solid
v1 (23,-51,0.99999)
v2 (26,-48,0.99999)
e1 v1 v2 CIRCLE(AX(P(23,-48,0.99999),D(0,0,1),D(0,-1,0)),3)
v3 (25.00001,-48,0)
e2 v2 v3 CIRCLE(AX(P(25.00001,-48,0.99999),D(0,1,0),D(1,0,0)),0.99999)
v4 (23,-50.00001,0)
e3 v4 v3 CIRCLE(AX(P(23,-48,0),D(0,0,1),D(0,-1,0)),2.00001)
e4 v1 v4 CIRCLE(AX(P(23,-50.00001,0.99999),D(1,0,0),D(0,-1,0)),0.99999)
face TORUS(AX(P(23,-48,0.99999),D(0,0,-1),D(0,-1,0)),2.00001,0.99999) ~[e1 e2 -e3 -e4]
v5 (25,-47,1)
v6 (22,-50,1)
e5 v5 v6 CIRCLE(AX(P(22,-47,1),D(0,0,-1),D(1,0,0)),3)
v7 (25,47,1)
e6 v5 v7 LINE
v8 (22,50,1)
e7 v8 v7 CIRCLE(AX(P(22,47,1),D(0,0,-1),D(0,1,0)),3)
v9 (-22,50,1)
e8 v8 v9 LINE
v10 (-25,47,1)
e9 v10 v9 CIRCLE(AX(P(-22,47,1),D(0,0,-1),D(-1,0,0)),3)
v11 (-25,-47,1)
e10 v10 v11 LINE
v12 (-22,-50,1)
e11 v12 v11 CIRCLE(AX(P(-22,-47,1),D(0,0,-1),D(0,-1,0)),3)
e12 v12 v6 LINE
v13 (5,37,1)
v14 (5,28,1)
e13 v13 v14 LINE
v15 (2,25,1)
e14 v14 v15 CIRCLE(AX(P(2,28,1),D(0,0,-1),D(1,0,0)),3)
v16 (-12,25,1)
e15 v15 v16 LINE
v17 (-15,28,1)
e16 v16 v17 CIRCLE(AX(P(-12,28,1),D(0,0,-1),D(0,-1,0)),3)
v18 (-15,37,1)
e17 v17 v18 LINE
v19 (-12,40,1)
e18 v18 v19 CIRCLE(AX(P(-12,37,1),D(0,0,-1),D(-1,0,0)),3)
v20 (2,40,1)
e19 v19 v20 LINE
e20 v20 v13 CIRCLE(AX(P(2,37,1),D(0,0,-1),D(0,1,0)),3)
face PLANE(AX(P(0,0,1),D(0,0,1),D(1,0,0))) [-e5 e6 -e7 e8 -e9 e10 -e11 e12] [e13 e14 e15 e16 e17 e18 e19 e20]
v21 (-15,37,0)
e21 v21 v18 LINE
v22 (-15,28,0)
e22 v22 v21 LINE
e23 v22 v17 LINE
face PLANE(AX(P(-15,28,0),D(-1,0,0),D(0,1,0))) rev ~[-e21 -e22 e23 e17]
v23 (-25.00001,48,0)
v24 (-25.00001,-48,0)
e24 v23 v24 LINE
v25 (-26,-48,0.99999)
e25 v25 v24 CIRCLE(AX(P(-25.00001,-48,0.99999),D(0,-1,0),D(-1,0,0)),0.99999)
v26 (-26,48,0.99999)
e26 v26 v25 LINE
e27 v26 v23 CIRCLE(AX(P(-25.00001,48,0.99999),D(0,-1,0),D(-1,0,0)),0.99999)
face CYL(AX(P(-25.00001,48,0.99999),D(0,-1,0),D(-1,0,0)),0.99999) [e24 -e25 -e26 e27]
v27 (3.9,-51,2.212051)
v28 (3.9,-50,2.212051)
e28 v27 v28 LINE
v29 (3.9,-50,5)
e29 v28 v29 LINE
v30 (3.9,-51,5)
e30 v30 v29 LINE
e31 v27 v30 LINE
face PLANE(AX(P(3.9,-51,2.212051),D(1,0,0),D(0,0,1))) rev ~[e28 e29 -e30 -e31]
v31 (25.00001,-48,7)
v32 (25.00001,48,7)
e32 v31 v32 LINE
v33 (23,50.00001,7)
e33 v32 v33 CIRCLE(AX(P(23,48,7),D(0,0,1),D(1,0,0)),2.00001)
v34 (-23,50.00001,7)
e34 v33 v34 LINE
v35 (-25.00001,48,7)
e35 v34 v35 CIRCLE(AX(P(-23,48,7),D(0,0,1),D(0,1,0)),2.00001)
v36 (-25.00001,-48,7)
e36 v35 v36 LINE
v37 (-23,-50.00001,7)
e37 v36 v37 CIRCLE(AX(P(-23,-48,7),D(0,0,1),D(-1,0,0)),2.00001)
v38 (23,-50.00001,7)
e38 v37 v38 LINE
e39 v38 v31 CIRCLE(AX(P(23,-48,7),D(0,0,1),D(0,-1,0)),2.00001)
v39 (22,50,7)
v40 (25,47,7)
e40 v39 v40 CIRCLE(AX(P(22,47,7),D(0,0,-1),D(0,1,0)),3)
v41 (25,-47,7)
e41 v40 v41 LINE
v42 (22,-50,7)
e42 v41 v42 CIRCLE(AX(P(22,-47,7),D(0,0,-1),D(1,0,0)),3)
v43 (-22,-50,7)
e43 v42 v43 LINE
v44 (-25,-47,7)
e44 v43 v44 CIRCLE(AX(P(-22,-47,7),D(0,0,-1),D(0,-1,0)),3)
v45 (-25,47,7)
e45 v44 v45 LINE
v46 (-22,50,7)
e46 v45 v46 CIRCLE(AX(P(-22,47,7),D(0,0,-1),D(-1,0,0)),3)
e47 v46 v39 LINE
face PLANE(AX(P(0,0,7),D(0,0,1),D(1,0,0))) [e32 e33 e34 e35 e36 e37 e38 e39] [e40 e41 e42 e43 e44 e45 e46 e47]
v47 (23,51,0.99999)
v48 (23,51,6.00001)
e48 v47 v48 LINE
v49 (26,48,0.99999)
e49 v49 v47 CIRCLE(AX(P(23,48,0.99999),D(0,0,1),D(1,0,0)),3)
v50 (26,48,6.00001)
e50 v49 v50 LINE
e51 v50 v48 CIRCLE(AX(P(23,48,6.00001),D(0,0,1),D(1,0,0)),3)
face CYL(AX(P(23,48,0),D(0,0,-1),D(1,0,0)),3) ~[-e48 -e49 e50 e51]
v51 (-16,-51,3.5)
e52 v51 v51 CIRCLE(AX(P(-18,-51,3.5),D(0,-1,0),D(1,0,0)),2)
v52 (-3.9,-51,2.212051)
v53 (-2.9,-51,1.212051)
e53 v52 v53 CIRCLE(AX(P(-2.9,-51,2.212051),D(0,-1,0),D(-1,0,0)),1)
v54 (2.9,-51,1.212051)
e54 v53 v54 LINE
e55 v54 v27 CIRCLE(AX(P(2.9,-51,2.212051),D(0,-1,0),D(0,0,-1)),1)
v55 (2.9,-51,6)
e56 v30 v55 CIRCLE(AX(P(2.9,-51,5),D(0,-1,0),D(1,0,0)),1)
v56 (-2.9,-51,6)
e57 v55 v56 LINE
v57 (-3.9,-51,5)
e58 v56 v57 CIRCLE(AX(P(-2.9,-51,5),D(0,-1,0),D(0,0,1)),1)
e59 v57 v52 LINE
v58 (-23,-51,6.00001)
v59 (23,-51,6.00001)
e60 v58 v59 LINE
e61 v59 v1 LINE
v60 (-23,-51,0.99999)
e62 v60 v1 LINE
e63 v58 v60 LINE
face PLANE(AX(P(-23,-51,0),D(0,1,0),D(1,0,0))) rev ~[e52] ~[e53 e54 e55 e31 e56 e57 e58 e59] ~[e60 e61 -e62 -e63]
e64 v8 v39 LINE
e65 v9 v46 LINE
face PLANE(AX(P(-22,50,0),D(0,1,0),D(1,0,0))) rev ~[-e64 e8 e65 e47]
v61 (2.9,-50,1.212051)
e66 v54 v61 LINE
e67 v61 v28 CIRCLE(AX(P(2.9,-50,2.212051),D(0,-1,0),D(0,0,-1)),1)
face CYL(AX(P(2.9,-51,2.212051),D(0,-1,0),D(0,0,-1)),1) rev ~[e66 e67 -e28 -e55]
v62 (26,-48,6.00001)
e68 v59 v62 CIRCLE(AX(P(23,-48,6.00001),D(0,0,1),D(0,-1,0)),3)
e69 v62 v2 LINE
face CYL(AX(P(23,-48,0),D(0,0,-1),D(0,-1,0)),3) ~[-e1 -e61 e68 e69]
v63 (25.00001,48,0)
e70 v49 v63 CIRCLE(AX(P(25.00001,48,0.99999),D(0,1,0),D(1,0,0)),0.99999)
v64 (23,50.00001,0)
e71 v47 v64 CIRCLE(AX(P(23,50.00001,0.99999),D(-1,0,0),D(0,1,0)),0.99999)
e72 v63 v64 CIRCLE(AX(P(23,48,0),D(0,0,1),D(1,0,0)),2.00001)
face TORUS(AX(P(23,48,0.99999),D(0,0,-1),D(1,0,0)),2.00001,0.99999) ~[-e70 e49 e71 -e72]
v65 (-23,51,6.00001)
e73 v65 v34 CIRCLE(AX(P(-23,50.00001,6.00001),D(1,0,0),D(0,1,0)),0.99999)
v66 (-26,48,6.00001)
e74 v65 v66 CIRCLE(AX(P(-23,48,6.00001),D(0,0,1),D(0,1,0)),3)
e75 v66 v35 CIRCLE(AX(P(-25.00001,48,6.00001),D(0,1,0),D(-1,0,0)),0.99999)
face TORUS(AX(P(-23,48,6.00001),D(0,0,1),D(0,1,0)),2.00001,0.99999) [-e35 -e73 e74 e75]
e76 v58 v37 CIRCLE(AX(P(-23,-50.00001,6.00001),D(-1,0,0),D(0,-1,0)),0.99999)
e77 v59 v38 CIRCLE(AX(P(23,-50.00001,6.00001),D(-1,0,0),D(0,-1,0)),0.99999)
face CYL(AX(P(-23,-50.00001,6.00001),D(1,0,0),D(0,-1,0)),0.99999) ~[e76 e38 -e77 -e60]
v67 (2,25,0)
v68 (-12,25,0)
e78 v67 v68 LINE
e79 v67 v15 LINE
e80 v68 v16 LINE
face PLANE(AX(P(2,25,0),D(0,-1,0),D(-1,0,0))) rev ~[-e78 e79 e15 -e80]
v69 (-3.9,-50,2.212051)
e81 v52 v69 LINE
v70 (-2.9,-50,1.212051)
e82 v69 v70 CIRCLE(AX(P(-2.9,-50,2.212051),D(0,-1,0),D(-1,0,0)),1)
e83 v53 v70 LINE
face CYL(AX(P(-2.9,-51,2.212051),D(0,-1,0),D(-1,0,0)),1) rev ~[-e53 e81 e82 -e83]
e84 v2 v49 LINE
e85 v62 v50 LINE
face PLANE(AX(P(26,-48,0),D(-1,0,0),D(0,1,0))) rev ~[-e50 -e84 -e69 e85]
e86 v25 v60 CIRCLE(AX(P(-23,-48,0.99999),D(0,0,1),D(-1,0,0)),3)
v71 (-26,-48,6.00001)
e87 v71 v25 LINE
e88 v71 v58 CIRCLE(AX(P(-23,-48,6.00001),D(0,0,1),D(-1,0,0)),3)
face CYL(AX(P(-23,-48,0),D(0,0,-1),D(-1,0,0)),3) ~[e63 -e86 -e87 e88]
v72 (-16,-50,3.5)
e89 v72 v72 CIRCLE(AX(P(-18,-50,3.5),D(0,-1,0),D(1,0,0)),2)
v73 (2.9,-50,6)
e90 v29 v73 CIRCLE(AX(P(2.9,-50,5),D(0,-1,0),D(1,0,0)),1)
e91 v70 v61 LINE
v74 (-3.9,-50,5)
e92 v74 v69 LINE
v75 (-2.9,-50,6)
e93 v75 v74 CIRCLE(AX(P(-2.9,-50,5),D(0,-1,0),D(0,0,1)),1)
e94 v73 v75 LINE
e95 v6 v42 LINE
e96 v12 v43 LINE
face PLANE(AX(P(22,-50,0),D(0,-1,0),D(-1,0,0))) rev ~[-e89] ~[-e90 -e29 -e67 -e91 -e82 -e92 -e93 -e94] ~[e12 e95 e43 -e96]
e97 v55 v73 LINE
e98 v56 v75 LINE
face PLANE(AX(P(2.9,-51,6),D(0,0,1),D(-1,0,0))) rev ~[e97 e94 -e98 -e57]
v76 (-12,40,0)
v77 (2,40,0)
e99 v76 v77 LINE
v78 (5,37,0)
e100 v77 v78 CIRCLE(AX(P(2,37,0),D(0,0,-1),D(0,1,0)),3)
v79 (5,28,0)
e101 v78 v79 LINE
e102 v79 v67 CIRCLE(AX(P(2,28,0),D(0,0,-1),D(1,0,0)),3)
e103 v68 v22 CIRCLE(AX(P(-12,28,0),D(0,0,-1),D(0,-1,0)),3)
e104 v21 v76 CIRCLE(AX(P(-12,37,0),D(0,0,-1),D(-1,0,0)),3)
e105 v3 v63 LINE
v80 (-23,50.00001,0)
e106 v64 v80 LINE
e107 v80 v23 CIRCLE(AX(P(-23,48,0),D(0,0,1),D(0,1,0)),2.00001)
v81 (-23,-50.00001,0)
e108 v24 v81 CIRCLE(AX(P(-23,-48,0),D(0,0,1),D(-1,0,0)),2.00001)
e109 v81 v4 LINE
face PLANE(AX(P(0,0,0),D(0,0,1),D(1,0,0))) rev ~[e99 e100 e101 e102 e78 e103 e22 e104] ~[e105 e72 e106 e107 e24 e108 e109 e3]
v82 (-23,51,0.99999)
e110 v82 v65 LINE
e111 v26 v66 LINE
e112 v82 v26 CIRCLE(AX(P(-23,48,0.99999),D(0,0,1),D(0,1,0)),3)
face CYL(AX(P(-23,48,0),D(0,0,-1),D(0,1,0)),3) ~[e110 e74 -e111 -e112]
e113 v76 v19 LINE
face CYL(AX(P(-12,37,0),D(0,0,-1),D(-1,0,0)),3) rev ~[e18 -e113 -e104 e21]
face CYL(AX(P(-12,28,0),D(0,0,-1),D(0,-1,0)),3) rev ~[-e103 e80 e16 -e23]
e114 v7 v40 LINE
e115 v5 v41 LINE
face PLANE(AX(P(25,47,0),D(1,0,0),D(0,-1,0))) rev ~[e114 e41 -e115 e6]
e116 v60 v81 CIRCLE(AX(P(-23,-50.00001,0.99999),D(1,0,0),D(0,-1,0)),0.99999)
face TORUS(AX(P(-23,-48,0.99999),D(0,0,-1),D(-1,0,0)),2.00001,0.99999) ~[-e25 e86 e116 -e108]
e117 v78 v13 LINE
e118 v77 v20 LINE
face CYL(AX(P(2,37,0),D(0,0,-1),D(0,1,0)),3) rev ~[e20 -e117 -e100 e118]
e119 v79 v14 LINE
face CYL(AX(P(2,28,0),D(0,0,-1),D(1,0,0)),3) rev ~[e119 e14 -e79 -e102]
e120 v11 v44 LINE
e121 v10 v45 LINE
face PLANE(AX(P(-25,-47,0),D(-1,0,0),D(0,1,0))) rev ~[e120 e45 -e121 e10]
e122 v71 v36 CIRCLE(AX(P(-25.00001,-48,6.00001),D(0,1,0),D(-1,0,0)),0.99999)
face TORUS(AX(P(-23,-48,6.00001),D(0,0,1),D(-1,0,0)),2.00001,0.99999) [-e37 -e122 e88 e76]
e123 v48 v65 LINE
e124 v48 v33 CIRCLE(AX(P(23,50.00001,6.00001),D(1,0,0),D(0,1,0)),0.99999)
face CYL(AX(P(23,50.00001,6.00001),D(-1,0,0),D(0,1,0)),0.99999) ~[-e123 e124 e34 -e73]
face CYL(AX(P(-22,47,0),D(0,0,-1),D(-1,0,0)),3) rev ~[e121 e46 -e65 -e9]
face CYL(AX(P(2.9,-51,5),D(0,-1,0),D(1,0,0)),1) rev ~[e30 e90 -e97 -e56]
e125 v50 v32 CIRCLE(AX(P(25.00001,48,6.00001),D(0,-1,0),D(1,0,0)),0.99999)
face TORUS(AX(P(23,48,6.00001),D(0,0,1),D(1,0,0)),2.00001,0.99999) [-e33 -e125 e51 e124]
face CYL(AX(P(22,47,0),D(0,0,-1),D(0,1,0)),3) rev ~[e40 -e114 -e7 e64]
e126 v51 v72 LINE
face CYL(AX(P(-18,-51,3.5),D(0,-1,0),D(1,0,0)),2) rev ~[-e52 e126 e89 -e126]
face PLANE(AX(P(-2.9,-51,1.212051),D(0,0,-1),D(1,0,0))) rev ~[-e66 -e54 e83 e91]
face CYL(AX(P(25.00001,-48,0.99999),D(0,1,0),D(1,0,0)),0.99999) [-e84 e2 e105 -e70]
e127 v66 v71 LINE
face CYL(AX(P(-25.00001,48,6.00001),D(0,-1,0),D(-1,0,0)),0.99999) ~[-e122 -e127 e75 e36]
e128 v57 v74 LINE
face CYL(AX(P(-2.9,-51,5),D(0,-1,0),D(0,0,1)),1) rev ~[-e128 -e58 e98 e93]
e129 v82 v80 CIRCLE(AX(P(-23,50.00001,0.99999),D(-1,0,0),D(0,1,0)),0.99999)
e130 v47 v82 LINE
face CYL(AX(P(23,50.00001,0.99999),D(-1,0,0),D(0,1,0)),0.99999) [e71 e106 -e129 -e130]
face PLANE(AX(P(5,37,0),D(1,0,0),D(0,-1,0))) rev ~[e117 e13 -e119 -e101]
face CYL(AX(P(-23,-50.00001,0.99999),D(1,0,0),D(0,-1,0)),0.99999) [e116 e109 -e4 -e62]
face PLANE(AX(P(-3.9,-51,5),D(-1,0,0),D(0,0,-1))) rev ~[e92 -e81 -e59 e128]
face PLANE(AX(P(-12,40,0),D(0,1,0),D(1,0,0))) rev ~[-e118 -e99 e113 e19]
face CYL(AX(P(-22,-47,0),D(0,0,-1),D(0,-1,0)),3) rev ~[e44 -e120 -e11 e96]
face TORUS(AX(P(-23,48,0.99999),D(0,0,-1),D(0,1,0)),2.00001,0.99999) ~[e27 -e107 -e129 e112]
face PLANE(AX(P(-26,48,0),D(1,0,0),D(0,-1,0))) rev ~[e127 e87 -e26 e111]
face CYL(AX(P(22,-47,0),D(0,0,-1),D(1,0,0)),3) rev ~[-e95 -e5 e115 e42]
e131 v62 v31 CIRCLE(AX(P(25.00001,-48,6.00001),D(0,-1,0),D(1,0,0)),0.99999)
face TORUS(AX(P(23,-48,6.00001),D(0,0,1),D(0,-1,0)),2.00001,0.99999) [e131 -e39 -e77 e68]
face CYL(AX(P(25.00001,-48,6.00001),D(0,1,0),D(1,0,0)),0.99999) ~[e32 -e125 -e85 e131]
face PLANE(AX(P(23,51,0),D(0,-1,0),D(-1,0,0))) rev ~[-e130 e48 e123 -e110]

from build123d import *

# Parameters (mm, degrees)
F1_DEPTH = 1
F2_DEPTH = 7
F3_R     = 0.99999
F4_R     = 2
F5_DEPTH = 1


# Not quite as in the source:
# - a fillet or chamfer is up to 0.001 mm smaller than in the source, because OpenCascade refuses the exact size


with BuildPart() as f1:
    # F0 (on Top) → F1 (new body)
    with BuildSketch(Plane.XY):
        with BuildLine():
            Line((26, -48), (26, 48))
            ThreePointArc((26, 48), (25.1213203436, 50.1213203436), (23, 51))
            Line((23, 51), (-23, 51))
            ThreePointArc((-23, 51), (-25.1213203436, 50.1213203436), (-26, 48))
            Line((-26, 48), (-26, -48))
            ThreePointArc((-26, -48), (-25.1213203436, -50.1213203436), (-23, -51))
            Line((-23, -51), (23, -51))
            ThreePointArc((23, -51), (25.1213203436, -50.1213203436), (26, -48))
        make_face()
        with BuildLine():
            ThreePointArc((-25, 47), (-24.1213203436, 49.1213203436), (-22, 50))
            Line((-22, 50), (22, 50))
            ThreePointArc((22, 50), (24.1213203436, 49.1213203436), (25, 47))
            Line((25, 47), (25, -47))
            ThreePointArc((25, -47), (24.1213203436, -49.1213203436), (22, -50))
            Line((22, -50), (-22, -50))
            ThreePointArc((-22, -50), (-24.1213203436, -49.1213203436), (-25, -47))
            Line((-25, -47), (-25, 47))
        make_face(mode=Mode.SUBTRACT)
        with BuildLine():
            Line((22, 50), (-22, 50))
            ThreePointArc((-22, 50), (-24.1213203436, 49.1213203436), (-25, 47))
            Line((-25, 47), (-25, -47))
            ThreePointArc((-25, -47), (-24.1213203436, -49.1213203436), (-22, -50))
            Line((-22, -50), (22, -50))
            ThreePointArc((22, -50), (24.1213203436, -49.1213203436), (25, -47))
            Line((25, -47), (25, 47))
            ThreePointArc((25, 47), (24.1213203436, 49.1213203436), (22, 50))
        make_face()
        with BuildLine():
            ThreePointArc((-15, 37), (-14.1213203436, 39.1213203436), (-12, 40))
            Line((-12, 40), (2, 40))
            ThreePointArc((2, 40), (4.1213203436, 39.1213203436), (5, 37))
            Line((5, 37), (5, 28))
            ThreePointArc((5, 28), (4.1213203436, 25.8786796564), (2, 25))
            Line((2, 25), (-12, 25))
            ThreePointArc((-12, 25), (-14.1213203436, 25.8786796564), (-15, 28))
            Line((-15, 28), (-15, 37))
        make_face(mode=Mode.SUBTRACT)
    extrude(amount=F1_DEPTH)

    # F0 (on Top) → F2 (join)
    with BuildSketch(Plane.XY):
        with BuildLine():
            Line((26, -48), (26, 48))
            ThreePointArc((26, 48), (25.1213203436, 50.1213203436), (23, 51))
            Line((23, 51), (-23, 51))
            ThreePointArc((-23, 51), (-25.1213203436, 50.1213203436), (-26, 48))
            Line((-26, 48), (-26, -48))
            ThreePointArc((-26, -48), (-25.1213203436, -50.1213203436), (-23, -51))
            Line((-23, -51), (23, -51))
            ThreePointArc((23, -51), (25.1213203436, -50.1213203436), (26, -48))
        make_face()
        with BuildLine():
            ThreePointArc((-25, 47), (-24.1213203436, 49.1213203436), (-22, 50))
            Line((-22, 50), (22, 50))
            ThreePointArc((22, 50), (24.1213203436, 49.1213203436), (25, 47))
            Line((25, 47), (25, -47))
            ThreePointArc((25, -47), (24.1213203436, -49.1213203436), (22, -50))
            Line((22, -50), (-22, -50))
            ThreePointArc((-22, -50), (-24.1213203436, -49.1213203436), (-25, -47))
            Line((-25, -47), (-25, 47))
        make_face(mode=Mode.SUBTRACT)
    extrude(amount=F2_DEPTH)

    # F3 (radius 1 in the source; OpenCascade refuses exactly that, so slightly less here)
    f3_edges = [f1.edges().sort_by_distance(p)[0] for p in [
        (26, 0, 0),
        (-26, 0, 7),
    ]]
    fillet(f3_edges, radius=F3_R)

    # F4 (on face) → F5 (cut, through all)
    with BuildSketch(Plane.XZ.offset(51)):
        with BuildLine():
            Line((2.9, 6), (-2.9, 6))
            ThreePointArc((-2.9, 6), (-3.6071067812, 5.7071067812), (-3.9, 5))
            Line((-3.9, 5), (-3.9, 2.2120511904))
            ThreePointArc((-3.9, 2.2120511904), (-3.6071067812, 1.5049444092), (-2.9, 1.2120511904))
            Line((-2.9, 1.2120511904), (2.9, 1.2120511904))
            ThreePointArc((2.9, 1.2120511904), (3.6071067812, 1.5049444092), (3.9, 2.2120511904))
            Line((3.9, 2.2120511904), (3.9, 5))
            ThreePointArc((3.9, 5), (3.6071067812, 5.7071067812), (2.9, 6))
        make_face()
        with Locations((-18, 3.5)):
            Circle(F4_R)
    extrude(amount=-F5_DEPTH, mode=Mode.SUBTRACT)


solid = f1.part
